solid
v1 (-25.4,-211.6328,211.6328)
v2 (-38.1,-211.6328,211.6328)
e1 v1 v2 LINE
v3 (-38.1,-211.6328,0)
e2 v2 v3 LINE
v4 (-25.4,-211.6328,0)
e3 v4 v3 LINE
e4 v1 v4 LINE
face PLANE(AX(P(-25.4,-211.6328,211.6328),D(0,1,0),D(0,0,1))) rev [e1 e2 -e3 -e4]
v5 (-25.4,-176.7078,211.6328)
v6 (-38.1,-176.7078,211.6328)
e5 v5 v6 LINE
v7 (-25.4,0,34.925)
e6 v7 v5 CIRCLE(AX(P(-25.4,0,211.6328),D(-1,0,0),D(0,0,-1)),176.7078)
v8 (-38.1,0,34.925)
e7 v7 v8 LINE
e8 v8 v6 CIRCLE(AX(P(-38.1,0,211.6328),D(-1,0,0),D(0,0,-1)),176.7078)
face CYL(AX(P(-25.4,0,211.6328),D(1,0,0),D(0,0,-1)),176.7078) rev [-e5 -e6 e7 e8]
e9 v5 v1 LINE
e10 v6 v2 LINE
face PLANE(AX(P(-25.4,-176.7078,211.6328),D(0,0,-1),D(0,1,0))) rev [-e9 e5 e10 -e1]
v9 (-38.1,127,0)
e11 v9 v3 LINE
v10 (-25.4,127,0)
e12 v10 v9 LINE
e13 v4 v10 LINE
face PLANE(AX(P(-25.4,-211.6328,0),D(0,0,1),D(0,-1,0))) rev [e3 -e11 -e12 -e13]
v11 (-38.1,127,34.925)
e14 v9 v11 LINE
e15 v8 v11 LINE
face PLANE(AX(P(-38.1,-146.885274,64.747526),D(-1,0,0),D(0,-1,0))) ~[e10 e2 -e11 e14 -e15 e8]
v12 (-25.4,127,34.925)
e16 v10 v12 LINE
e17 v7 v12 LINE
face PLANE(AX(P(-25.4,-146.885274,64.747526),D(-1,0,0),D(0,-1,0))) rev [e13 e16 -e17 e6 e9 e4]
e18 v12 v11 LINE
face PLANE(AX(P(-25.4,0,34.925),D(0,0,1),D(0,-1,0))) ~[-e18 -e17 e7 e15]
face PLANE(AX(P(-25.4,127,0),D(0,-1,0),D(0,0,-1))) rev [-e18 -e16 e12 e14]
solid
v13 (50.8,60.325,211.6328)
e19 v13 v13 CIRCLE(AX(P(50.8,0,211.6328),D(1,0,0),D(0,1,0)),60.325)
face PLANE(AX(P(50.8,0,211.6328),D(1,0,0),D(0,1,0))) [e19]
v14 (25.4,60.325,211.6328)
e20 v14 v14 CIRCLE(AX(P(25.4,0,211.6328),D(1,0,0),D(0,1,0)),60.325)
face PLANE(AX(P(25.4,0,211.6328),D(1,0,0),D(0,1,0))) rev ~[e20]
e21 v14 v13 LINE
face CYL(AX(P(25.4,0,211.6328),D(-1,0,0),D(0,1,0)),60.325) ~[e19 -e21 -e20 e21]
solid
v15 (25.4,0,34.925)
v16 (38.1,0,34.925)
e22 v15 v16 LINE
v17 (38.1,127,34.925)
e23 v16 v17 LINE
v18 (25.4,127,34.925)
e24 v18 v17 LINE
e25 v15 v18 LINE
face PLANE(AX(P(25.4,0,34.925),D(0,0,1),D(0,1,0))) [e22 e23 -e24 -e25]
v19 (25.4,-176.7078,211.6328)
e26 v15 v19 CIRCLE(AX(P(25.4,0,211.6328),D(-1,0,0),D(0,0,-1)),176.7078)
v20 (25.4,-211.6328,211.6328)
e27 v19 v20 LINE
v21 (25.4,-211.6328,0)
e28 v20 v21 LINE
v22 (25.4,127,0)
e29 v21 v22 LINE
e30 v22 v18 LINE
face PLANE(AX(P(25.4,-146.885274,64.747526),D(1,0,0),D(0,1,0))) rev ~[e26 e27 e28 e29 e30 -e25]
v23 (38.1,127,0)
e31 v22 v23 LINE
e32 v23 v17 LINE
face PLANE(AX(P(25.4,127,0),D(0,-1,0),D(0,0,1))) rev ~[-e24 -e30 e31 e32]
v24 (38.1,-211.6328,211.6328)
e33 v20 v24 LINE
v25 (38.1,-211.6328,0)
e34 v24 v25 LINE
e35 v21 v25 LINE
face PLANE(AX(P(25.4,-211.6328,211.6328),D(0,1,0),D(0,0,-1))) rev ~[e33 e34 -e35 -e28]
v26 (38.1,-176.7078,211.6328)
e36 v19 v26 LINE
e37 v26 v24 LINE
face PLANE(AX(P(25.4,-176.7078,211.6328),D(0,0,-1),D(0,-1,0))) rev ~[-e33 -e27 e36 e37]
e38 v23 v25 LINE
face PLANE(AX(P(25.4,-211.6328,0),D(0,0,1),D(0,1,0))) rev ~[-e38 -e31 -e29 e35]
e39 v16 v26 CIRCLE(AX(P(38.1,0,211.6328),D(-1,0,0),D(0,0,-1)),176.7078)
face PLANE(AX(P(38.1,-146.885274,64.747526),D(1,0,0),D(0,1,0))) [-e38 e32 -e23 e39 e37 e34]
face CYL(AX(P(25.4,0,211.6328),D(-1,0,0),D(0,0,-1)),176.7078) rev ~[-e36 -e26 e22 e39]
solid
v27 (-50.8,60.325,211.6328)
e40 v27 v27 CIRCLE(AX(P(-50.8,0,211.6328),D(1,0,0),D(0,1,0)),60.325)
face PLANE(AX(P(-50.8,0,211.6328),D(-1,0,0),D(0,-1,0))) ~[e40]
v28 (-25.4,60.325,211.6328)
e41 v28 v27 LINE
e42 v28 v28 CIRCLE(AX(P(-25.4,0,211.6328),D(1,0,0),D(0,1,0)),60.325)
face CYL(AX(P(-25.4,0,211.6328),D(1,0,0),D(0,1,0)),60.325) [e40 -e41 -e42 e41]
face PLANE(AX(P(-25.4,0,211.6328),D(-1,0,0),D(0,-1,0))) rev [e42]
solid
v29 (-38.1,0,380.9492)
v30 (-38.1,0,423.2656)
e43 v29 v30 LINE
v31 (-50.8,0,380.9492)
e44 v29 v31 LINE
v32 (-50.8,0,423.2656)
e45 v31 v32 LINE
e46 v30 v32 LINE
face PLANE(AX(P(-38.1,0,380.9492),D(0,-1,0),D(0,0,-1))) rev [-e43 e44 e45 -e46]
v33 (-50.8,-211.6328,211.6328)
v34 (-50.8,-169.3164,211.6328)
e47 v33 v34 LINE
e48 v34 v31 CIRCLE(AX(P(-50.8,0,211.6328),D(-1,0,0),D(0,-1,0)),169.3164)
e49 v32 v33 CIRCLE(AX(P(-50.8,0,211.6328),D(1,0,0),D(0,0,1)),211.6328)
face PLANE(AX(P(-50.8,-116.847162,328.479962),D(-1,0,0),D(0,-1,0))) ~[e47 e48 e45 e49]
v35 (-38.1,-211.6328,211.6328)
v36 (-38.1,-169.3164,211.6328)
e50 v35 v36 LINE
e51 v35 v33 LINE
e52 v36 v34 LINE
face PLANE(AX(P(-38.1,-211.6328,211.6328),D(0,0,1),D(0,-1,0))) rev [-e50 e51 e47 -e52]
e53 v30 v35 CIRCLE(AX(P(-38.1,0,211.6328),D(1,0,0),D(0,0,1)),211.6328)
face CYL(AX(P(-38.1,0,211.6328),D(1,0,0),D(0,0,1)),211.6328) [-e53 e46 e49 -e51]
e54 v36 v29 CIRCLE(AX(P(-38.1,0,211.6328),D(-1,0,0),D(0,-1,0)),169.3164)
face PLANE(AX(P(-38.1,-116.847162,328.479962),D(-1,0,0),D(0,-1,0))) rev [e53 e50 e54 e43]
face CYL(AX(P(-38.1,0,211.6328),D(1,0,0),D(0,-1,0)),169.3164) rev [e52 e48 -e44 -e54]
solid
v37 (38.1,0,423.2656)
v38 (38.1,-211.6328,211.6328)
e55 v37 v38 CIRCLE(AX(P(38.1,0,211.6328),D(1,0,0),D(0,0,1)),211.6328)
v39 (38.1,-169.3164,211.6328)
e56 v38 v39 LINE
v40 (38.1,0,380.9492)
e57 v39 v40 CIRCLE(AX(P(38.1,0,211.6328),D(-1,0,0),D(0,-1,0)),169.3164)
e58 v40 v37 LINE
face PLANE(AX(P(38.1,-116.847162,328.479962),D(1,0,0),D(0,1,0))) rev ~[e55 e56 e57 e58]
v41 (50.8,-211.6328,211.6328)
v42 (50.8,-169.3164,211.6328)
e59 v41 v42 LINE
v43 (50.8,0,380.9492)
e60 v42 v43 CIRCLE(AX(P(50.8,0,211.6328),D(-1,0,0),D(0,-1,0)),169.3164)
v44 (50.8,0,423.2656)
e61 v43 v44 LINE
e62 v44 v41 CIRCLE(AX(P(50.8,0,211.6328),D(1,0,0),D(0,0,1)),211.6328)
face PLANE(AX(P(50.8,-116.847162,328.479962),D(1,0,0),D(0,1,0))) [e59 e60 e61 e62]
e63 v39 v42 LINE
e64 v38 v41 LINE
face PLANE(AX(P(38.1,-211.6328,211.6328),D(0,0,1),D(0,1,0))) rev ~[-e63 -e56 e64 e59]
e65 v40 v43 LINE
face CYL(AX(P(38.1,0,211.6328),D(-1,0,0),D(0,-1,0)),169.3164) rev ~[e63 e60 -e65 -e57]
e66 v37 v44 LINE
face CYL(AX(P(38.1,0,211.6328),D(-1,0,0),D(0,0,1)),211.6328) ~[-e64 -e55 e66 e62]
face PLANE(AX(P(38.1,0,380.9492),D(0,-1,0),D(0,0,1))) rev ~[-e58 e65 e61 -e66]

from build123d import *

# Parameters (mm, degrees)
F4_R      = 60.325
F5_DEPTH  = 25.4
F4_W      = 127
F4_H      = 34.925
F6_DEPTH  = 12.7
F7_DEPTH  = 12.7
F10_DEPTH = 12.7


# Not quite as in the source:
# - a variable given as a bare number and used for a length is read in inches; the dataset says mm whatever the document's units were


with BuildPart() as f5:
    # F4 (on offset) → F5 (new body)
    with BuildSketch(Plane.YZ.offset(25.4)):
        with Locations((0, 211.6328)):
            Circle(F4_R)
    extrude(amount=F5_DEPTH)


with BuildPart() as f6:
    # F4 (on offset) → F6 (new body)
    with BuildSketch(Plane.YZ.offset(25.4)):
        with BuildLine():
            ThreePointArc((-211.6328, 211.6328), (-149.6469880015, 61.9858119985), (0, 0))
            Line((0, 0), (0, 34.925))
            ThreePointArc((0, 34.925), (-124.9512836686, 86.6815163314), (-176.7078, 211.6328))
            Line((-176.7078, 211.6328), (-211.6328, 211.6328))
        make_face()
        with Locations((63.5, 17.4625)):
            Rectangle(F4_W, F4_H)
    extrude(amount=F6_DEPTH)

    # F4 (on offset) → F7 (join)
    with BuildSketch(Plane.YZ.offset(25.4)):
        with BuildLine():
            Line((-211.6328, 0), (0, 0))
            ThreePointArc((0, 0), (-149.6469880015, 61.9858119985), (-211.6328, 211.6328))
            Line((-211.6328, 211.6328), (-211.6328, 0))
        make_face()
    extrude(amount=F7_DEPTH)


with BuildPart() as f10:
    # F9 (on offset) → F10 (new body)
    with BuildSketch(Plane.YZ.offset(38.1)):
        with BuildLine():
            ThreePointArc((-169.3164, 211.6328), (-119.7247746061, 331.3575746061), (0, 380.9492))
            Line((0, 380.9492), (0, 423.2656))
            ThreePointArc((0, 423.2656), (-149.6469880015, 361.2797880015), (-211.6328, 211.6328))
            Line((-211.6328, 211.6328), (-169.3164, 211.6328))
        make_face()
    extrude(amount=F10_DEPTH)


with BuildPart() as f11_1:
    # F11: instance of F10
    add(f10.part.mirror(Plane.YZ))


with BuildPart() as f11_2:
    # F11: instance of F5
    add(f5.part.mirror(Plane.YZ))


with BuildPart() as f11_3:
    # F11: instance of F6
    add(f6.part.mirror(Plane.YZ))


solid = Compound([f5.part, f6.part, f10.part, f11_1.part, f11_2.part, f11_3.part])
